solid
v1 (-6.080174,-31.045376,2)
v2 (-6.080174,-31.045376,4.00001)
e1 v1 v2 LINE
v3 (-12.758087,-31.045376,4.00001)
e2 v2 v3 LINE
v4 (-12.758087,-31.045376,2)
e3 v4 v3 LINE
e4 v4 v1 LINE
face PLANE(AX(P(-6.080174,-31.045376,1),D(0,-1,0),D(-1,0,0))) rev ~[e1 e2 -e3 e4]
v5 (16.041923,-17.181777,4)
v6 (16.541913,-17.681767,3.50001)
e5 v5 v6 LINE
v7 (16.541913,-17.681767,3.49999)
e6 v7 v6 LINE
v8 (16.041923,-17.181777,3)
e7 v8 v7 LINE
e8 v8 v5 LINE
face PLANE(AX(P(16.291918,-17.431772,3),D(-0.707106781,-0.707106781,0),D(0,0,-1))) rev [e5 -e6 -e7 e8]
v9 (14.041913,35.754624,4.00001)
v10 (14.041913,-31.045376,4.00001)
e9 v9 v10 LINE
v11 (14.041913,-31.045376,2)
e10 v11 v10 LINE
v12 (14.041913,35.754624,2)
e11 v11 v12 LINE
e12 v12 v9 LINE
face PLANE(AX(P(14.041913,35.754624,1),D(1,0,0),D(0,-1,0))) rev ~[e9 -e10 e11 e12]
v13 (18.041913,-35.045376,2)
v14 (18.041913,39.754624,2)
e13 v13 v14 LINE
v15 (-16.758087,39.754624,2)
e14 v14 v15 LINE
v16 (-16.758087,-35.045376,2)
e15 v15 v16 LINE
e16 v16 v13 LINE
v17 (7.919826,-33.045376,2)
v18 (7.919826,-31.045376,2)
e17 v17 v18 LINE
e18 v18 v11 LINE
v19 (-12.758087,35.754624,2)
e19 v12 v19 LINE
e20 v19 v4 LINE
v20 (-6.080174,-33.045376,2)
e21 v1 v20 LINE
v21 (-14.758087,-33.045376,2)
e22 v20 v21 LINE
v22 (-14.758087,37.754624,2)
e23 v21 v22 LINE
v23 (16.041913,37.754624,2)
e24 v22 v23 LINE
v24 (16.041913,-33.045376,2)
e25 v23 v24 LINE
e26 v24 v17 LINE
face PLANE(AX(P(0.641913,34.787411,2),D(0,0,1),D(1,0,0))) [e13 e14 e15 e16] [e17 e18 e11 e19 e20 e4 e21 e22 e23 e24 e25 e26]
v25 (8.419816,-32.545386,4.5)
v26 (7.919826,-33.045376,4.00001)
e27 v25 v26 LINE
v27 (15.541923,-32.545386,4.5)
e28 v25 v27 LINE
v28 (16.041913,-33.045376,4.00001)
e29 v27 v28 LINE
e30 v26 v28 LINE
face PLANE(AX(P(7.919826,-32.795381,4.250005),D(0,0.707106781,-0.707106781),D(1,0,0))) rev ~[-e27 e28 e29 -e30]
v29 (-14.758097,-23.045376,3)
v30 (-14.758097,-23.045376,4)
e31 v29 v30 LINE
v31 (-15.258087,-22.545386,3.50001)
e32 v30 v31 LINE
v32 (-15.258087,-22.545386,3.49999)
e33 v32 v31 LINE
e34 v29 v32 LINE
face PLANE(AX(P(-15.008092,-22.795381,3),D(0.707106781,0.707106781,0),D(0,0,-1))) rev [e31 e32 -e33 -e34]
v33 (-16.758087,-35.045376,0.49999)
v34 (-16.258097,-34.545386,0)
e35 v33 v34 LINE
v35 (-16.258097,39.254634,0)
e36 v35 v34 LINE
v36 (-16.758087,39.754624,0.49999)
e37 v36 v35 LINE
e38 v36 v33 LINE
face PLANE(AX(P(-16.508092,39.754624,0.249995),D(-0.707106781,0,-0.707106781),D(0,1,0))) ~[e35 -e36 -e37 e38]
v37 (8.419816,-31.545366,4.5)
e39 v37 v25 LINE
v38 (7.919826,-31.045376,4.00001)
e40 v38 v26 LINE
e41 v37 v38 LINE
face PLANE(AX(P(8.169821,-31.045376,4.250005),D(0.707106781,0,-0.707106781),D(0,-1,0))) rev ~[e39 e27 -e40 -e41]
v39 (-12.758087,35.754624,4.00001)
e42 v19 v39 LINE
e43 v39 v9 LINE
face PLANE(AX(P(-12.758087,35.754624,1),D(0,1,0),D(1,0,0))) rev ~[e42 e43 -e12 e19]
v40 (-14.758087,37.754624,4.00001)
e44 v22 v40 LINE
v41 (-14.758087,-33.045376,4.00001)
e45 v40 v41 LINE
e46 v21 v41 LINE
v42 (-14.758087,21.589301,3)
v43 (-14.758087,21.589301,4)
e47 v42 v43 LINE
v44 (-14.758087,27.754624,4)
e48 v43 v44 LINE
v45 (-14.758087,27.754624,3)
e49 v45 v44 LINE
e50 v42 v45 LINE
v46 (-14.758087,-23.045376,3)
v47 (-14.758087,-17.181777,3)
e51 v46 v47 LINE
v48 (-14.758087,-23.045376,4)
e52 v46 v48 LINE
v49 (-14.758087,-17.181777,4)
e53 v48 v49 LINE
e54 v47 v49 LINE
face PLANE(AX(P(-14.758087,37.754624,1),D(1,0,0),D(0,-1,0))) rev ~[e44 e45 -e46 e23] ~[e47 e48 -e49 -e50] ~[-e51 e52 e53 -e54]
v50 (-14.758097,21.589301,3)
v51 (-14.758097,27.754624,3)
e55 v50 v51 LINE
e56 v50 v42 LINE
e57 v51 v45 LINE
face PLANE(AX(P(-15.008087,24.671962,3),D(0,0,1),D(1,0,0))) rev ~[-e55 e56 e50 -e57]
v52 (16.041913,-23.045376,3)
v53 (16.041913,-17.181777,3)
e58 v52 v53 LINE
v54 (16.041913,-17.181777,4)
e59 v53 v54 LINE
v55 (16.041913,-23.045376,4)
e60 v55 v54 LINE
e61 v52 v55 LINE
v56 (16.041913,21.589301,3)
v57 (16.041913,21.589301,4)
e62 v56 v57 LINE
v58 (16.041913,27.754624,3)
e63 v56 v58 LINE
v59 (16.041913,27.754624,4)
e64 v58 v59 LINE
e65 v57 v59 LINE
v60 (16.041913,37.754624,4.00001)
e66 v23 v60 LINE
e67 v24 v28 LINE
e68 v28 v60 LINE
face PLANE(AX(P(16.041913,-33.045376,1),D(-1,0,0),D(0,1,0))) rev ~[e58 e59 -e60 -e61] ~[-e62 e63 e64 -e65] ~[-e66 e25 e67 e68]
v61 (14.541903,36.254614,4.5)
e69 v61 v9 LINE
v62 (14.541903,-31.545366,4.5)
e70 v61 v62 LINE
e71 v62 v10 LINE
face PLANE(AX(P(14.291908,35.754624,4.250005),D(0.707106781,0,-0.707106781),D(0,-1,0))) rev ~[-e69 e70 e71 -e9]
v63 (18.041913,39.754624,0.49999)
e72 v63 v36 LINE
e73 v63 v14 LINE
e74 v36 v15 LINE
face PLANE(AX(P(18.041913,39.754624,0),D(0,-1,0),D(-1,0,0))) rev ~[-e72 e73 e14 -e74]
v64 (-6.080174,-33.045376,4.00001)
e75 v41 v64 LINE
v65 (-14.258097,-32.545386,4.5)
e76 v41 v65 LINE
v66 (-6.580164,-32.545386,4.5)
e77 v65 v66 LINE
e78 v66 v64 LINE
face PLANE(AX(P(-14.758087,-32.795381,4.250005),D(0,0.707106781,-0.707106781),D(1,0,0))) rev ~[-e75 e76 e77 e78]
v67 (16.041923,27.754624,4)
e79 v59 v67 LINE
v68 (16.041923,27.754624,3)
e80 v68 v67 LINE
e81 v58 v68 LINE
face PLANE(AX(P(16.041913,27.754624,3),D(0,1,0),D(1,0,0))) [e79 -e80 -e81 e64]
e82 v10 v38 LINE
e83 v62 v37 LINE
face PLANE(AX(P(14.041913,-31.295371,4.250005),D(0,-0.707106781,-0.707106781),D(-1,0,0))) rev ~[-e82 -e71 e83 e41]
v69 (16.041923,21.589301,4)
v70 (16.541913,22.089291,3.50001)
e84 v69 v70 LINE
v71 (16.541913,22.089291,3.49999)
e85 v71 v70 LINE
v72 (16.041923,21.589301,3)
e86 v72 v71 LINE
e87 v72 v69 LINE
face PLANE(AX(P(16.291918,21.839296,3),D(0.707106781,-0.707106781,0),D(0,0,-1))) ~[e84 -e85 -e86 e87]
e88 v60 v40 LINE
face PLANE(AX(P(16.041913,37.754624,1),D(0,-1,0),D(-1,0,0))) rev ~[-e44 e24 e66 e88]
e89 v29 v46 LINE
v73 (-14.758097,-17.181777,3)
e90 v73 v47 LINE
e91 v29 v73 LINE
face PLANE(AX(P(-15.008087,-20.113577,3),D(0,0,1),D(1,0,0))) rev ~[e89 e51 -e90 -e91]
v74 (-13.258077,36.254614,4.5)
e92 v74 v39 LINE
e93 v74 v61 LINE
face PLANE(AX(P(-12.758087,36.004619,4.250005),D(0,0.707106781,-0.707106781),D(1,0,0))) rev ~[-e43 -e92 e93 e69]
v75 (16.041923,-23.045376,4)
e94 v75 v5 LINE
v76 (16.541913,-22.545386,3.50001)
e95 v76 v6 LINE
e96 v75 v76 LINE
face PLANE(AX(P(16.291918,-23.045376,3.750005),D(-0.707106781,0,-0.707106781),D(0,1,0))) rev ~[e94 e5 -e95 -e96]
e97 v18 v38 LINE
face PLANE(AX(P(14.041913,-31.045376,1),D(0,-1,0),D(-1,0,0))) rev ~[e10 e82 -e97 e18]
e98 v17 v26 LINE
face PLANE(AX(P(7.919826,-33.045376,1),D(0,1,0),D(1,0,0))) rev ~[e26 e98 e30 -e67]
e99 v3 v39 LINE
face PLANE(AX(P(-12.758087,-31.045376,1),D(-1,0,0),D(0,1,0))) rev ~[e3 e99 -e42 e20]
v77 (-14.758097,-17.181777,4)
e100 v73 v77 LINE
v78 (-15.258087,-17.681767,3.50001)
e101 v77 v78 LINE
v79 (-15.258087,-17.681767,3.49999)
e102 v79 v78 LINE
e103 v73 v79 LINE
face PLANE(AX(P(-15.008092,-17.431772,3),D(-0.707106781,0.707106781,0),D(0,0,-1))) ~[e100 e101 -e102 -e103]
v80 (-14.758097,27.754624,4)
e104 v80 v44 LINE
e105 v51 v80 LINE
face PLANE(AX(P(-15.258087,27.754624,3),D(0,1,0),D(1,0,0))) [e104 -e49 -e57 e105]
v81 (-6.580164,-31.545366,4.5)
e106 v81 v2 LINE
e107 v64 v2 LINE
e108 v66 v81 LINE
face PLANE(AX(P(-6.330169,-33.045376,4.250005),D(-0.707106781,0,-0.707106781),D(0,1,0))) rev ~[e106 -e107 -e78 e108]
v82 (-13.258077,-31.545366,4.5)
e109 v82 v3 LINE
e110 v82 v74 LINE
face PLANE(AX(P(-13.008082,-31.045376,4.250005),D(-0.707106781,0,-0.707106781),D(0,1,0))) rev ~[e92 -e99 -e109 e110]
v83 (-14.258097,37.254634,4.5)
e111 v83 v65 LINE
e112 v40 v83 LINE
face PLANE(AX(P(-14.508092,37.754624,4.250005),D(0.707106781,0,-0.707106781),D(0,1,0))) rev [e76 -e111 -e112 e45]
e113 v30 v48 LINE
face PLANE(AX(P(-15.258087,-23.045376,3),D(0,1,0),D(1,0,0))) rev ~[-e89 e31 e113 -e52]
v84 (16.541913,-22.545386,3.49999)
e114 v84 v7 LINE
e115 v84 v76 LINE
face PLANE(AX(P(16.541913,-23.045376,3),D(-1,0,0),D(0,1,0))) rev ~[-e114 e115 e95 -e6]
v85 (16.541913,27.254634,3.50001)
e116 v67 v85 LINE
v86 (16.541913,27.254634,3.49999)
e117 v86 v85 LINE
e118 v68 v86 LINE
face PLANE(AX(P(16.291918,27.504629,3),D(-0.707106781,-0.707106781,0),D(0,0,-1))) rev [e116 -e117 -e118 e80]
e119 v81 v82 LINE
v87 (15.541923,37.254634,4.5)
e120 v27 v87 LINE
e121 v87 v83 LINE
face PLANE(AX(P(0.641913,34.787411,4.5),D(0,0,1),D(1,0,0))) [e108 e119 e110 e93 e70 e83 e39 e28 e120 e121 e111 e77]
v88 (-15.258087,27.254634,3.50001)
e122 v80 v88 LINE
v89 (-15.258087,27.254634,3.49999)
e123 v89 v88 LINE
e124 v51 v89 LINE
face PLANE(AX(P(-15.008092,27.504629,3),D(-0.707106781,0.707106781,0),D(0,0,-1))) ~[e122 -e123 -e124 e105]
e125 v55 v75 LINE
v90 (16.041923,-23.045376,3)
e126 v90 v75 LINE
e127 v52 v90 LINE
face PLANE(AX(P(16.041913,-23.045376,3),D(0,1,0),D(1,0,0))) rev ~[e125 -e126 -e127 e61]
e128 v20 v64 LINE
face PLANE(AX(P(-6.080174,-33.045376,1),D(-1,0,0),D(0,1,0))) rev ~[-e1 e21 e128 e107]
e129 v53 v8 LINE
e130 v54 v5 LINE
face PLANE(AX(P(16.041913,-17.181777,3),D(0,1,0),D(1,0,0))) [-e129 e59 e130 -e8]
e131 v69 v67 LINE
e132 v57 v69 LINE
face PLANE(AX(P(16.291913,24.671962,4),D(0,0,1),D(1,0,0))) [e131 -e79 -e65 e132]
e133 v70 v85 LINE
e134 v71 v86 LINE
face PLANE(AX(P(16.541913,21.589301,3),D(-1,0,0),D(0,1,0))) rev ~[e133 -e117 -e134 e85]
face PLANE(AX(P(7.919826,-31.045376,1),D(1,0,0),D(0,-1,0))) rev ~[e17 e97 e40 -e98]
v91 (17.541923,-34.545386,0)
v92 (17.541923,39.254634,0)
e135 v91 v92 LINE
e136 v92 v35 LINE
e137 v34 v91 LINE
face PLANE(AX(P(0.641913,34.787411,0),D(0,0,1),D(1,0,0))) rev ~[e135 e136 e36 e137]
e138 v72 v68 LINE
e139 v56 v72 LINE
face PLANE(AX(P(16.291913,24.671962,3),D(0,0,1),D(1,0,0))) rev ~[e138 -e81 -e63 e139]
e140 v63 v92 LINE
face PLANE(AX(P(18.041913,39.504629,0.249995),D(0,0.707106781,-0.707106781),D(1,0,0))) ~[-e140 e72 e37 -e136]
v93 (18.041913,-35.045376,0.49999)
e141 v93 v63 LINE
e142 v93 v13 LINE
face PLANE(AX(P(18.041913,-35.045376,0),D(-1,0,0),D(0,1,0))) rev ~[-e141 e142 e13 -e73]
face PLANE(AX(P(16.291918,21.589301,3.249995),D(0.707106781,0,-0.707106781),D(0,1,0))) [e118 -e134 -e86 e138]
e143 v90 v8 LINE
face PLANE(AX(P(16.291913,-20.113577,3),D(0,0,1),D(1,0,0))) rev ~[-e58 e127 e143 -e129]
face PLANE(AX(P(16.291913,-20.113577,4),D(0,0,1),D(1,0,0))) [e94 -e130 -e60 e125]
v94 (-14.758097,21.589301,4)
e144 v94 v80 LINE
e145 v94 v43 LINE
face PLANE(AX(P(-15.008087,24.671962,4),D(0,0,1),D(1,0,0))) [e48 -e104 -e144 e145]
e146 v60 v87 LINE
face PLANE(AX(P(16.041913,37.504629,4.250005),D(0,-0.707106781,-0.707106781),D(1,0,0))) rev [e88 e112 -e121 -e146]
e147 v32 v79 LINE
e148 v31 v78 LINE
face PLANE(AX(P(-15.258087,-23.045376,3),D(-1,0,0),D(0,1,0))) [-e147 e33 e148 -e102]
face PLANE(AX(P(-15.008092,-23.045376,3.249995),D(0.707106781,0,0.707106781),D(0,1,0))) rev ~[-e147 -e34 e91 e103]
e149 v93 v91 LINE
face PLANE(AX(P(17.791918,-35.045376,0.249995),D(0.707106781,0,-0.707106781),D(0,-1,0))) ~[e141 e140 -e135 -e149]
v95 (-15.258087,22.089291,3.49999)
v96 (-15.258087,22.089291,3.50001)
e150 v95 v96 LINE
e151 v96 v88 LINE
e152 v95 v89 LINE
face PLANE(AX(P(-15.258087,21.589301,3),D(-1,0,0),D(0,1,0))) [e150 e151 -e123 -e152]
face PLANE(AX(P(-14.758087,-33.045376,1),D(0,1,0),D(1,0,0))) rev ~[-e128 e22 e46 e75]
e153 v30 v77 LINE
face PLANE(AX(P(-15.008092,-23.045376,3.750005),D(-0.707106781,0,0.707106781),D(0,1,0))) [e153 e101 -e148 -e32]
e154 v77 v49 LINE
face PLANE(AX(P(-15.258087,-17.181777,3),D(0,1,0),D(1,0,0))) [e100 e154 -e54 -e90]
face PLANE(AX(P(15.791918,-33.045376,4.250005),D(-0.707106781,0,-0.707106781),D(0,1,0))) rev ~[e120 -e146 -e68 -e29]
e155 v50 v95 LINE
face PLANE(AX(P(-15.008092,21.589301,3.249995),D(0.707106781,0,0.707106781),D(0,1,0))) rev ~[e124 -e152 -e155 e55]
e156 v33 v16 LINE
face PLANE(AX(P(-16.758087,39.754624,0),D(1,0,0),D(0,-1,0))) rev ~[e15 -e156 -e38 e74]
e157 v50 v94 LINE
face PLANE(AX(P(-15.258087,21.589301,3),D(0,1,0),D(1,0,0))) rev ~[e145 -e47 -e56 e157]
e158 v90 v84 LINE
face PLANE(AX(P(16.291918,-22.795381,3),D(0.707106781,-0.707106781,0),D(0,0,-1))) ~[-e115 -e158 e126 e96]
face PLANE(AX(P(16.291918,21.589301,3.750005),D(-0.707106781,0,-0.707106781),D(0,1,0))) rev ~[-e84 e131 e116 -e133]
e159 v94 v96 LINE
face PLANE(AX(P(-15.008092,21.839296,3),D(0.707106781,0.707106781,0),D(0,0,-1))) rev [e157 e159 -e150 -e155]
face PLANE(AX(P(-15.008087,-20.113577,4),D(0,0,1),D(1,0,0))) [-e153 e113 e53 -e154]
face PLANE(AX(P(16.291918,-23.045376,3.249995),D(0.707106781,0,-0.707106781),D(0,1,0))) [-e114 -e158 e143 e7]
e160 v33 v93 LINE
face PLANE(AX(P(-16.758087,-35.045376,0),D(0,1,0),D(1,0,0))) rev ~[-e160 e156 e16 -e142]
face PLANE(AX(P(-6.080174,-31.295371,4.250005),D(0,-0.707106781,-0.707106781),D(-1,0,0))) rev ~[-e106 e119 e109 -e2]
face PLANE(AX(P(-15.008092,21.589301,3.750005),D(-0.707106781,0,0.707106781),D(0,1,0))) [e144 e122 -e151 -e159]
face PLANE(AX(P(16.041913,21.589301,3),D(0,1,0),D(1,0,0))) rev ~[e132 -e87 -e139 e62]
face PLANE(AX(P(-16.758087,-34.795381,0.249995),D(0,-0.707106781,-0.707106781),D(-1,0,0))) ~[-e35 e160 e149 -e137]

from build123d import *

# Parameters (mm, degrees)
F1_W     = 2
F1_H     = 6.165323171
F1_H_2   = 5.8635988384
F1_H_3   = 38.7710779905
F1_W_2   = 14
F1_H_4   = 2
F1_W_3   = 26.8
F1_H_5   = 8
F1_W_4   = 0.5
F2_DEPTH = 2
F3_START = 1
F3_DEPTH = 3.5
F4_START = 3
F4_DEPTH = 1
F5_SIZE  = 0.49999


# Not quite as in the source:
# - a fillet or chamfer is up to 0.001 mm smaller than in the source, because OpenCascade refuses the exact size


with BuildPart() as f2:
    # F1 (on Top) → F2 (new body)
    with BuildSketch(Plane.XY):
        Polygon((16.0419130247, 37.7546238333), (-14.7580869753, 37.7546238333), (-14.7580869753, 27.7546238333), (-12.7580869753, 27.7546238333), (-12.7580869753, 35.7546238333), (14.0419130247, 35.7546238333), (14.0419130247, 27.7546238333), (16.0419130247, 27.7546238333), align=None)
        Polygon((-12.7580869753, -23.0453761667), (-14.7580869753, -23.0453761667), (-14.7580869753, -26.0453761667), (-14.7580869753, -33.0453761667), (-6.0801735182, -33.0453761667), (-6.0801735182, -31.0453761667), (-12.7580869753, -31.0453761667), align=None)
        with Locations((-13.7580869753, 24.6719622478)):
            Rectangle(F1_W, F1_H)
        with Locations((-13.7580869753, -20.1135767475)):
            Rectangle(F1_W, F1_H_2)
        Polygon((-12.7580869753, 21.5893006623), (-14.7580869753, 21.5893006623), (-14.7580869753, -3.2453761667), (-14.7580869753, -17.1817773283), (-12.7580869753, -17.1817773283), align=None)
        with Locations((15.0419130247, 2.203761667)):
            Rectangle(F1_W, F1_H_3)
        with Locations((15.0419130247, -20.1135767475)):
            Rectangle(F1_W, F1_H_2)
        Polygon((16.0419130247, -33.0453761667), (16.0419130247, -23.0453761667), (14.0419130247, -23.0453761667), (14.0419130247, -31.0453761667), (7.9198264818, -31.0453761667), (7.9198264818, -33.0453761667), align=None)
        with Locations((15.0419130247, 24.6719622478)):
            Rectangle(F1_W, F1_H)
        Polygon((-14.7580869753, -26.0453761667), (-16.7580869753, -26.0453761667), (-16.7580869753, -35.0453761667), (-6.0801735182, -35.0453761667), (-6.0801735182, -33.0453761667), (-14.7580869753, -33.0453761667), align=None)
        with Locations((0.9198264818, -32.0453761667)):
            Rectangle(F1_W_2, F1_H_4)
        with Locations((0.9198264818, -34.0453761667)):
            Rectangle(F1_W_2, F1_H_4)
        with Locations((0.6419130247, 24.6719622478)):
            Rectangle(F1_W_3, F1_H)
        with Locations((0.6419130247, 2.203761667)):
            Rectangle(F1_W_3, F1_H_3)
        Polygon((14.0419130247, -23.0453761667), (-12.7580869753, -23.0453761667), (-12.7580869753, -31.0453761667), (-6.0801735182, -31.0453761667), (7.9198264818, -31.0453761667), (14.0419130247, -31.0453761667), align=None)
        Polygon((-14.7580869753, 27.7546238333), (-14.7580869753, 37.7546238333), (16.0419130247, 37.7546238333), (16.0419130247, 27.7546238333), (16.5419130247, 27.7546238333), (16.5419130247, 21.5893006623), (16.0419130247, 21.5893006623), (16.0419130247, -17.1817773283), (16.5419130247, -17.1817773283), (16.5419130247, -23.0453761667), (16.0419130247, -23.0453761667), (16.0419130247, -33.0453761667), (7.9198264818, -33.0453761667), (7.9198264818, -35.0453761667), (18.0419130247, -35.0453761667), (18.0419130247, 39.7546238333), (-16.7580869753, 39.7546238333), (-16.7580869753, -3.2453761667), (-14.7580869753, -3.2453761667), (-14.7580869753, 21.5893006623), (-15.2580869753, 21.5893006623), (-15.2580869753, 27.7546238333), align=None)
        with Locations((0.6419130247, 31.7546238333)):
            Rectangle(F1_W_3, F1_H_5)
        Polygon((-14.7580869753, -17.1817773283), (-14.7580869753, -3.2453761667), (-16.7580869753, -3.2453761667), (-16.7580869753, -26.0453761667), (-14.7580869753, -26.0453761667), (-14.7580869753, -23.0453761667), (-15.2580869753, -23.0453761667), (-15.2580869753, -17.1817773283), align=None)
        with Locations((0.6419130247, -20.1135767475)):
            Rectangle(F1_W_3, F1_H_2)
        with Locations((-15.0080869753, -20.1135767475)):
            Rectangle(F1_W_4, F1_H_2)
        with Locations((-15.0080869753, 24.6719622478)):
            Rectangle(F1_W_4, F1_H)
        with Locations((16.2919130247, -20.1135767475)):
            Rectangle(F1_W_4, F1_H_2)
        with Locations((16.2919130247, 24.6719622478)):
            Rectangle(F1_W_4, F1_H)
    extrude(amount=F2_DEPTH)

    # F1 (on Top) → F3 (join)
    with BuildSketch(Plane.XY.offset(F3_START)):
        Polygon((16.0419130247, 37.7546238333), (-14.7580869753, 37.7546238333), (-14.7580869753, 27.7546238333), (-12.7580869753, 27.7546238333), (-12.7580869753, 35.7546238333), (14.0419130247, 35.7546238333), (14.0419130247, 27.7546238333), (16.0419130247, 27.7546238333), align=None)
        with Locations((-13.7580869753, 24.6719622478)):
            Rectangle(F1_W, F1_H)
        with Locations((15.0419130247, 24.6719622478)):
            Rectangle(F1_W, F1_H)
        with Locations((15.0419130247, 2.203761667)):
            Rectangle(F1_W, F1_H_3)
        Polygon((-12.7580869753, 21.5893006623), (-14.7580869753, 21.5893006623), (-14.7580869753, -3.2453761667), (-14.7580869753, -17.1817773283), (-12.7580869753, -17.1817773283), align=None)
        with Locations((15.0419130247, -20.1135767475)):
            Rectangle(F1_W, F1_H_2)
        Polygon((16.0419130247, -33.0453761667), (16.0419130247, -23.0453761667), (14.0419130247, -23.0453761667), (14.0419130247, -31.0453761667), (7.9198264818, -31.0453761667), (7.9198264818, -33.0453761667), align=None)
        Polygon((-12.7580869753, -23.0453761667), (-14.7580869753, -23.0453761667), (-14.7580869753, -26.0453761667), (-14.7580869753, -33.0453761667), (-6.0801735182, -33.0453761667), (-6.0801735182, -31.0453761667), (-12.7580869753, -31.0453761667), align=None)
        with Locations((-13.7580869753, -20.1135767475)):
            Rectangle(F1_W, F1_H_2)
    extrude(amount=F3_DEPTH)

    # F1 (on Top) → F4 (join)
    with BuildSketch(Plane.XY.offset(F4_START)):
        with Locations((-15.0080869753, 24.6719622478)):
            Rectangle(F1_W_4, F1_H)
        with Locations((-15.0080869753, -20.1135767475)):
            Rectangle(F1_W_4, F1_H_2)
        with Locations((16.2919130247, -20.1135767475)):
            Rectangle(F1_W_4, F1_H_2)
        with Locations((16.2919130247, 24.6719622478)):
            Rectangle(F1_W_4, F1_H)
    extrude(amount=F4_DEPTH)

    # F5 (size 0.5 in the source; OpenCascade refuses exactly that, so slightly less here)
    f5_edges = [f2.edges().sort_by_distance(p)[0] for p in [
        (0.641913, -35.045376, 0),
        (18.041913, 2.354624, 0),
        (0.641913, 39.754624, 0),
        (-16.758087, 2.354624, 0),
        (16.541913, -23.045376, 3.5),
        (16.541913, -17.181777, 3.5),
        (16.541913, -20.113577, 3),
        (16.541913, -20.113577, 4),
        (16.541913, 21.589301, 3.5),
        (16.541913, 27.754624, 3.5),
        (16.541913, 24.671962, 3),
        (16.541913, 24.671962, 4),
        (-15.258087, 27.754624, 3.5),
        (-15.258087, 21.589301, 3.5),
        (-15.258087, 24.671962, 3),
        (-15.258087, 24.671962, 4),
        (-15.258087, -17.181777, 3.5),
        (-15.258087, -23.045376, 3.5),
        (-15.258087, -20.113577, 3),
        (-15.258087, -20.113577, 4),
        (0.641913, 37.754624, 4.5),
        (-14.758087, 2.354624, 4.5),
        (-10.41913, -33.045376, 4.5),
        (-6.080174, -32.045376, 4.5),
        (-9.41913, -31.045376, 4.5),
        (-12.758087, 2.354624, 4.5),
        (0.641913, 35.754624, 4.5),
        (14.041913, 2.354624, 4.5),
        (10.98087, -31.045376, 4.5),
        (7.919826, -32.045376, 4.5),
        (11.98087, -33.045376, 4.5),
        (16.041913, 2.354624, 4.5),
    ]]
    chamfer(f5_edges, length=F5_SIZE)


solid = f2.part
